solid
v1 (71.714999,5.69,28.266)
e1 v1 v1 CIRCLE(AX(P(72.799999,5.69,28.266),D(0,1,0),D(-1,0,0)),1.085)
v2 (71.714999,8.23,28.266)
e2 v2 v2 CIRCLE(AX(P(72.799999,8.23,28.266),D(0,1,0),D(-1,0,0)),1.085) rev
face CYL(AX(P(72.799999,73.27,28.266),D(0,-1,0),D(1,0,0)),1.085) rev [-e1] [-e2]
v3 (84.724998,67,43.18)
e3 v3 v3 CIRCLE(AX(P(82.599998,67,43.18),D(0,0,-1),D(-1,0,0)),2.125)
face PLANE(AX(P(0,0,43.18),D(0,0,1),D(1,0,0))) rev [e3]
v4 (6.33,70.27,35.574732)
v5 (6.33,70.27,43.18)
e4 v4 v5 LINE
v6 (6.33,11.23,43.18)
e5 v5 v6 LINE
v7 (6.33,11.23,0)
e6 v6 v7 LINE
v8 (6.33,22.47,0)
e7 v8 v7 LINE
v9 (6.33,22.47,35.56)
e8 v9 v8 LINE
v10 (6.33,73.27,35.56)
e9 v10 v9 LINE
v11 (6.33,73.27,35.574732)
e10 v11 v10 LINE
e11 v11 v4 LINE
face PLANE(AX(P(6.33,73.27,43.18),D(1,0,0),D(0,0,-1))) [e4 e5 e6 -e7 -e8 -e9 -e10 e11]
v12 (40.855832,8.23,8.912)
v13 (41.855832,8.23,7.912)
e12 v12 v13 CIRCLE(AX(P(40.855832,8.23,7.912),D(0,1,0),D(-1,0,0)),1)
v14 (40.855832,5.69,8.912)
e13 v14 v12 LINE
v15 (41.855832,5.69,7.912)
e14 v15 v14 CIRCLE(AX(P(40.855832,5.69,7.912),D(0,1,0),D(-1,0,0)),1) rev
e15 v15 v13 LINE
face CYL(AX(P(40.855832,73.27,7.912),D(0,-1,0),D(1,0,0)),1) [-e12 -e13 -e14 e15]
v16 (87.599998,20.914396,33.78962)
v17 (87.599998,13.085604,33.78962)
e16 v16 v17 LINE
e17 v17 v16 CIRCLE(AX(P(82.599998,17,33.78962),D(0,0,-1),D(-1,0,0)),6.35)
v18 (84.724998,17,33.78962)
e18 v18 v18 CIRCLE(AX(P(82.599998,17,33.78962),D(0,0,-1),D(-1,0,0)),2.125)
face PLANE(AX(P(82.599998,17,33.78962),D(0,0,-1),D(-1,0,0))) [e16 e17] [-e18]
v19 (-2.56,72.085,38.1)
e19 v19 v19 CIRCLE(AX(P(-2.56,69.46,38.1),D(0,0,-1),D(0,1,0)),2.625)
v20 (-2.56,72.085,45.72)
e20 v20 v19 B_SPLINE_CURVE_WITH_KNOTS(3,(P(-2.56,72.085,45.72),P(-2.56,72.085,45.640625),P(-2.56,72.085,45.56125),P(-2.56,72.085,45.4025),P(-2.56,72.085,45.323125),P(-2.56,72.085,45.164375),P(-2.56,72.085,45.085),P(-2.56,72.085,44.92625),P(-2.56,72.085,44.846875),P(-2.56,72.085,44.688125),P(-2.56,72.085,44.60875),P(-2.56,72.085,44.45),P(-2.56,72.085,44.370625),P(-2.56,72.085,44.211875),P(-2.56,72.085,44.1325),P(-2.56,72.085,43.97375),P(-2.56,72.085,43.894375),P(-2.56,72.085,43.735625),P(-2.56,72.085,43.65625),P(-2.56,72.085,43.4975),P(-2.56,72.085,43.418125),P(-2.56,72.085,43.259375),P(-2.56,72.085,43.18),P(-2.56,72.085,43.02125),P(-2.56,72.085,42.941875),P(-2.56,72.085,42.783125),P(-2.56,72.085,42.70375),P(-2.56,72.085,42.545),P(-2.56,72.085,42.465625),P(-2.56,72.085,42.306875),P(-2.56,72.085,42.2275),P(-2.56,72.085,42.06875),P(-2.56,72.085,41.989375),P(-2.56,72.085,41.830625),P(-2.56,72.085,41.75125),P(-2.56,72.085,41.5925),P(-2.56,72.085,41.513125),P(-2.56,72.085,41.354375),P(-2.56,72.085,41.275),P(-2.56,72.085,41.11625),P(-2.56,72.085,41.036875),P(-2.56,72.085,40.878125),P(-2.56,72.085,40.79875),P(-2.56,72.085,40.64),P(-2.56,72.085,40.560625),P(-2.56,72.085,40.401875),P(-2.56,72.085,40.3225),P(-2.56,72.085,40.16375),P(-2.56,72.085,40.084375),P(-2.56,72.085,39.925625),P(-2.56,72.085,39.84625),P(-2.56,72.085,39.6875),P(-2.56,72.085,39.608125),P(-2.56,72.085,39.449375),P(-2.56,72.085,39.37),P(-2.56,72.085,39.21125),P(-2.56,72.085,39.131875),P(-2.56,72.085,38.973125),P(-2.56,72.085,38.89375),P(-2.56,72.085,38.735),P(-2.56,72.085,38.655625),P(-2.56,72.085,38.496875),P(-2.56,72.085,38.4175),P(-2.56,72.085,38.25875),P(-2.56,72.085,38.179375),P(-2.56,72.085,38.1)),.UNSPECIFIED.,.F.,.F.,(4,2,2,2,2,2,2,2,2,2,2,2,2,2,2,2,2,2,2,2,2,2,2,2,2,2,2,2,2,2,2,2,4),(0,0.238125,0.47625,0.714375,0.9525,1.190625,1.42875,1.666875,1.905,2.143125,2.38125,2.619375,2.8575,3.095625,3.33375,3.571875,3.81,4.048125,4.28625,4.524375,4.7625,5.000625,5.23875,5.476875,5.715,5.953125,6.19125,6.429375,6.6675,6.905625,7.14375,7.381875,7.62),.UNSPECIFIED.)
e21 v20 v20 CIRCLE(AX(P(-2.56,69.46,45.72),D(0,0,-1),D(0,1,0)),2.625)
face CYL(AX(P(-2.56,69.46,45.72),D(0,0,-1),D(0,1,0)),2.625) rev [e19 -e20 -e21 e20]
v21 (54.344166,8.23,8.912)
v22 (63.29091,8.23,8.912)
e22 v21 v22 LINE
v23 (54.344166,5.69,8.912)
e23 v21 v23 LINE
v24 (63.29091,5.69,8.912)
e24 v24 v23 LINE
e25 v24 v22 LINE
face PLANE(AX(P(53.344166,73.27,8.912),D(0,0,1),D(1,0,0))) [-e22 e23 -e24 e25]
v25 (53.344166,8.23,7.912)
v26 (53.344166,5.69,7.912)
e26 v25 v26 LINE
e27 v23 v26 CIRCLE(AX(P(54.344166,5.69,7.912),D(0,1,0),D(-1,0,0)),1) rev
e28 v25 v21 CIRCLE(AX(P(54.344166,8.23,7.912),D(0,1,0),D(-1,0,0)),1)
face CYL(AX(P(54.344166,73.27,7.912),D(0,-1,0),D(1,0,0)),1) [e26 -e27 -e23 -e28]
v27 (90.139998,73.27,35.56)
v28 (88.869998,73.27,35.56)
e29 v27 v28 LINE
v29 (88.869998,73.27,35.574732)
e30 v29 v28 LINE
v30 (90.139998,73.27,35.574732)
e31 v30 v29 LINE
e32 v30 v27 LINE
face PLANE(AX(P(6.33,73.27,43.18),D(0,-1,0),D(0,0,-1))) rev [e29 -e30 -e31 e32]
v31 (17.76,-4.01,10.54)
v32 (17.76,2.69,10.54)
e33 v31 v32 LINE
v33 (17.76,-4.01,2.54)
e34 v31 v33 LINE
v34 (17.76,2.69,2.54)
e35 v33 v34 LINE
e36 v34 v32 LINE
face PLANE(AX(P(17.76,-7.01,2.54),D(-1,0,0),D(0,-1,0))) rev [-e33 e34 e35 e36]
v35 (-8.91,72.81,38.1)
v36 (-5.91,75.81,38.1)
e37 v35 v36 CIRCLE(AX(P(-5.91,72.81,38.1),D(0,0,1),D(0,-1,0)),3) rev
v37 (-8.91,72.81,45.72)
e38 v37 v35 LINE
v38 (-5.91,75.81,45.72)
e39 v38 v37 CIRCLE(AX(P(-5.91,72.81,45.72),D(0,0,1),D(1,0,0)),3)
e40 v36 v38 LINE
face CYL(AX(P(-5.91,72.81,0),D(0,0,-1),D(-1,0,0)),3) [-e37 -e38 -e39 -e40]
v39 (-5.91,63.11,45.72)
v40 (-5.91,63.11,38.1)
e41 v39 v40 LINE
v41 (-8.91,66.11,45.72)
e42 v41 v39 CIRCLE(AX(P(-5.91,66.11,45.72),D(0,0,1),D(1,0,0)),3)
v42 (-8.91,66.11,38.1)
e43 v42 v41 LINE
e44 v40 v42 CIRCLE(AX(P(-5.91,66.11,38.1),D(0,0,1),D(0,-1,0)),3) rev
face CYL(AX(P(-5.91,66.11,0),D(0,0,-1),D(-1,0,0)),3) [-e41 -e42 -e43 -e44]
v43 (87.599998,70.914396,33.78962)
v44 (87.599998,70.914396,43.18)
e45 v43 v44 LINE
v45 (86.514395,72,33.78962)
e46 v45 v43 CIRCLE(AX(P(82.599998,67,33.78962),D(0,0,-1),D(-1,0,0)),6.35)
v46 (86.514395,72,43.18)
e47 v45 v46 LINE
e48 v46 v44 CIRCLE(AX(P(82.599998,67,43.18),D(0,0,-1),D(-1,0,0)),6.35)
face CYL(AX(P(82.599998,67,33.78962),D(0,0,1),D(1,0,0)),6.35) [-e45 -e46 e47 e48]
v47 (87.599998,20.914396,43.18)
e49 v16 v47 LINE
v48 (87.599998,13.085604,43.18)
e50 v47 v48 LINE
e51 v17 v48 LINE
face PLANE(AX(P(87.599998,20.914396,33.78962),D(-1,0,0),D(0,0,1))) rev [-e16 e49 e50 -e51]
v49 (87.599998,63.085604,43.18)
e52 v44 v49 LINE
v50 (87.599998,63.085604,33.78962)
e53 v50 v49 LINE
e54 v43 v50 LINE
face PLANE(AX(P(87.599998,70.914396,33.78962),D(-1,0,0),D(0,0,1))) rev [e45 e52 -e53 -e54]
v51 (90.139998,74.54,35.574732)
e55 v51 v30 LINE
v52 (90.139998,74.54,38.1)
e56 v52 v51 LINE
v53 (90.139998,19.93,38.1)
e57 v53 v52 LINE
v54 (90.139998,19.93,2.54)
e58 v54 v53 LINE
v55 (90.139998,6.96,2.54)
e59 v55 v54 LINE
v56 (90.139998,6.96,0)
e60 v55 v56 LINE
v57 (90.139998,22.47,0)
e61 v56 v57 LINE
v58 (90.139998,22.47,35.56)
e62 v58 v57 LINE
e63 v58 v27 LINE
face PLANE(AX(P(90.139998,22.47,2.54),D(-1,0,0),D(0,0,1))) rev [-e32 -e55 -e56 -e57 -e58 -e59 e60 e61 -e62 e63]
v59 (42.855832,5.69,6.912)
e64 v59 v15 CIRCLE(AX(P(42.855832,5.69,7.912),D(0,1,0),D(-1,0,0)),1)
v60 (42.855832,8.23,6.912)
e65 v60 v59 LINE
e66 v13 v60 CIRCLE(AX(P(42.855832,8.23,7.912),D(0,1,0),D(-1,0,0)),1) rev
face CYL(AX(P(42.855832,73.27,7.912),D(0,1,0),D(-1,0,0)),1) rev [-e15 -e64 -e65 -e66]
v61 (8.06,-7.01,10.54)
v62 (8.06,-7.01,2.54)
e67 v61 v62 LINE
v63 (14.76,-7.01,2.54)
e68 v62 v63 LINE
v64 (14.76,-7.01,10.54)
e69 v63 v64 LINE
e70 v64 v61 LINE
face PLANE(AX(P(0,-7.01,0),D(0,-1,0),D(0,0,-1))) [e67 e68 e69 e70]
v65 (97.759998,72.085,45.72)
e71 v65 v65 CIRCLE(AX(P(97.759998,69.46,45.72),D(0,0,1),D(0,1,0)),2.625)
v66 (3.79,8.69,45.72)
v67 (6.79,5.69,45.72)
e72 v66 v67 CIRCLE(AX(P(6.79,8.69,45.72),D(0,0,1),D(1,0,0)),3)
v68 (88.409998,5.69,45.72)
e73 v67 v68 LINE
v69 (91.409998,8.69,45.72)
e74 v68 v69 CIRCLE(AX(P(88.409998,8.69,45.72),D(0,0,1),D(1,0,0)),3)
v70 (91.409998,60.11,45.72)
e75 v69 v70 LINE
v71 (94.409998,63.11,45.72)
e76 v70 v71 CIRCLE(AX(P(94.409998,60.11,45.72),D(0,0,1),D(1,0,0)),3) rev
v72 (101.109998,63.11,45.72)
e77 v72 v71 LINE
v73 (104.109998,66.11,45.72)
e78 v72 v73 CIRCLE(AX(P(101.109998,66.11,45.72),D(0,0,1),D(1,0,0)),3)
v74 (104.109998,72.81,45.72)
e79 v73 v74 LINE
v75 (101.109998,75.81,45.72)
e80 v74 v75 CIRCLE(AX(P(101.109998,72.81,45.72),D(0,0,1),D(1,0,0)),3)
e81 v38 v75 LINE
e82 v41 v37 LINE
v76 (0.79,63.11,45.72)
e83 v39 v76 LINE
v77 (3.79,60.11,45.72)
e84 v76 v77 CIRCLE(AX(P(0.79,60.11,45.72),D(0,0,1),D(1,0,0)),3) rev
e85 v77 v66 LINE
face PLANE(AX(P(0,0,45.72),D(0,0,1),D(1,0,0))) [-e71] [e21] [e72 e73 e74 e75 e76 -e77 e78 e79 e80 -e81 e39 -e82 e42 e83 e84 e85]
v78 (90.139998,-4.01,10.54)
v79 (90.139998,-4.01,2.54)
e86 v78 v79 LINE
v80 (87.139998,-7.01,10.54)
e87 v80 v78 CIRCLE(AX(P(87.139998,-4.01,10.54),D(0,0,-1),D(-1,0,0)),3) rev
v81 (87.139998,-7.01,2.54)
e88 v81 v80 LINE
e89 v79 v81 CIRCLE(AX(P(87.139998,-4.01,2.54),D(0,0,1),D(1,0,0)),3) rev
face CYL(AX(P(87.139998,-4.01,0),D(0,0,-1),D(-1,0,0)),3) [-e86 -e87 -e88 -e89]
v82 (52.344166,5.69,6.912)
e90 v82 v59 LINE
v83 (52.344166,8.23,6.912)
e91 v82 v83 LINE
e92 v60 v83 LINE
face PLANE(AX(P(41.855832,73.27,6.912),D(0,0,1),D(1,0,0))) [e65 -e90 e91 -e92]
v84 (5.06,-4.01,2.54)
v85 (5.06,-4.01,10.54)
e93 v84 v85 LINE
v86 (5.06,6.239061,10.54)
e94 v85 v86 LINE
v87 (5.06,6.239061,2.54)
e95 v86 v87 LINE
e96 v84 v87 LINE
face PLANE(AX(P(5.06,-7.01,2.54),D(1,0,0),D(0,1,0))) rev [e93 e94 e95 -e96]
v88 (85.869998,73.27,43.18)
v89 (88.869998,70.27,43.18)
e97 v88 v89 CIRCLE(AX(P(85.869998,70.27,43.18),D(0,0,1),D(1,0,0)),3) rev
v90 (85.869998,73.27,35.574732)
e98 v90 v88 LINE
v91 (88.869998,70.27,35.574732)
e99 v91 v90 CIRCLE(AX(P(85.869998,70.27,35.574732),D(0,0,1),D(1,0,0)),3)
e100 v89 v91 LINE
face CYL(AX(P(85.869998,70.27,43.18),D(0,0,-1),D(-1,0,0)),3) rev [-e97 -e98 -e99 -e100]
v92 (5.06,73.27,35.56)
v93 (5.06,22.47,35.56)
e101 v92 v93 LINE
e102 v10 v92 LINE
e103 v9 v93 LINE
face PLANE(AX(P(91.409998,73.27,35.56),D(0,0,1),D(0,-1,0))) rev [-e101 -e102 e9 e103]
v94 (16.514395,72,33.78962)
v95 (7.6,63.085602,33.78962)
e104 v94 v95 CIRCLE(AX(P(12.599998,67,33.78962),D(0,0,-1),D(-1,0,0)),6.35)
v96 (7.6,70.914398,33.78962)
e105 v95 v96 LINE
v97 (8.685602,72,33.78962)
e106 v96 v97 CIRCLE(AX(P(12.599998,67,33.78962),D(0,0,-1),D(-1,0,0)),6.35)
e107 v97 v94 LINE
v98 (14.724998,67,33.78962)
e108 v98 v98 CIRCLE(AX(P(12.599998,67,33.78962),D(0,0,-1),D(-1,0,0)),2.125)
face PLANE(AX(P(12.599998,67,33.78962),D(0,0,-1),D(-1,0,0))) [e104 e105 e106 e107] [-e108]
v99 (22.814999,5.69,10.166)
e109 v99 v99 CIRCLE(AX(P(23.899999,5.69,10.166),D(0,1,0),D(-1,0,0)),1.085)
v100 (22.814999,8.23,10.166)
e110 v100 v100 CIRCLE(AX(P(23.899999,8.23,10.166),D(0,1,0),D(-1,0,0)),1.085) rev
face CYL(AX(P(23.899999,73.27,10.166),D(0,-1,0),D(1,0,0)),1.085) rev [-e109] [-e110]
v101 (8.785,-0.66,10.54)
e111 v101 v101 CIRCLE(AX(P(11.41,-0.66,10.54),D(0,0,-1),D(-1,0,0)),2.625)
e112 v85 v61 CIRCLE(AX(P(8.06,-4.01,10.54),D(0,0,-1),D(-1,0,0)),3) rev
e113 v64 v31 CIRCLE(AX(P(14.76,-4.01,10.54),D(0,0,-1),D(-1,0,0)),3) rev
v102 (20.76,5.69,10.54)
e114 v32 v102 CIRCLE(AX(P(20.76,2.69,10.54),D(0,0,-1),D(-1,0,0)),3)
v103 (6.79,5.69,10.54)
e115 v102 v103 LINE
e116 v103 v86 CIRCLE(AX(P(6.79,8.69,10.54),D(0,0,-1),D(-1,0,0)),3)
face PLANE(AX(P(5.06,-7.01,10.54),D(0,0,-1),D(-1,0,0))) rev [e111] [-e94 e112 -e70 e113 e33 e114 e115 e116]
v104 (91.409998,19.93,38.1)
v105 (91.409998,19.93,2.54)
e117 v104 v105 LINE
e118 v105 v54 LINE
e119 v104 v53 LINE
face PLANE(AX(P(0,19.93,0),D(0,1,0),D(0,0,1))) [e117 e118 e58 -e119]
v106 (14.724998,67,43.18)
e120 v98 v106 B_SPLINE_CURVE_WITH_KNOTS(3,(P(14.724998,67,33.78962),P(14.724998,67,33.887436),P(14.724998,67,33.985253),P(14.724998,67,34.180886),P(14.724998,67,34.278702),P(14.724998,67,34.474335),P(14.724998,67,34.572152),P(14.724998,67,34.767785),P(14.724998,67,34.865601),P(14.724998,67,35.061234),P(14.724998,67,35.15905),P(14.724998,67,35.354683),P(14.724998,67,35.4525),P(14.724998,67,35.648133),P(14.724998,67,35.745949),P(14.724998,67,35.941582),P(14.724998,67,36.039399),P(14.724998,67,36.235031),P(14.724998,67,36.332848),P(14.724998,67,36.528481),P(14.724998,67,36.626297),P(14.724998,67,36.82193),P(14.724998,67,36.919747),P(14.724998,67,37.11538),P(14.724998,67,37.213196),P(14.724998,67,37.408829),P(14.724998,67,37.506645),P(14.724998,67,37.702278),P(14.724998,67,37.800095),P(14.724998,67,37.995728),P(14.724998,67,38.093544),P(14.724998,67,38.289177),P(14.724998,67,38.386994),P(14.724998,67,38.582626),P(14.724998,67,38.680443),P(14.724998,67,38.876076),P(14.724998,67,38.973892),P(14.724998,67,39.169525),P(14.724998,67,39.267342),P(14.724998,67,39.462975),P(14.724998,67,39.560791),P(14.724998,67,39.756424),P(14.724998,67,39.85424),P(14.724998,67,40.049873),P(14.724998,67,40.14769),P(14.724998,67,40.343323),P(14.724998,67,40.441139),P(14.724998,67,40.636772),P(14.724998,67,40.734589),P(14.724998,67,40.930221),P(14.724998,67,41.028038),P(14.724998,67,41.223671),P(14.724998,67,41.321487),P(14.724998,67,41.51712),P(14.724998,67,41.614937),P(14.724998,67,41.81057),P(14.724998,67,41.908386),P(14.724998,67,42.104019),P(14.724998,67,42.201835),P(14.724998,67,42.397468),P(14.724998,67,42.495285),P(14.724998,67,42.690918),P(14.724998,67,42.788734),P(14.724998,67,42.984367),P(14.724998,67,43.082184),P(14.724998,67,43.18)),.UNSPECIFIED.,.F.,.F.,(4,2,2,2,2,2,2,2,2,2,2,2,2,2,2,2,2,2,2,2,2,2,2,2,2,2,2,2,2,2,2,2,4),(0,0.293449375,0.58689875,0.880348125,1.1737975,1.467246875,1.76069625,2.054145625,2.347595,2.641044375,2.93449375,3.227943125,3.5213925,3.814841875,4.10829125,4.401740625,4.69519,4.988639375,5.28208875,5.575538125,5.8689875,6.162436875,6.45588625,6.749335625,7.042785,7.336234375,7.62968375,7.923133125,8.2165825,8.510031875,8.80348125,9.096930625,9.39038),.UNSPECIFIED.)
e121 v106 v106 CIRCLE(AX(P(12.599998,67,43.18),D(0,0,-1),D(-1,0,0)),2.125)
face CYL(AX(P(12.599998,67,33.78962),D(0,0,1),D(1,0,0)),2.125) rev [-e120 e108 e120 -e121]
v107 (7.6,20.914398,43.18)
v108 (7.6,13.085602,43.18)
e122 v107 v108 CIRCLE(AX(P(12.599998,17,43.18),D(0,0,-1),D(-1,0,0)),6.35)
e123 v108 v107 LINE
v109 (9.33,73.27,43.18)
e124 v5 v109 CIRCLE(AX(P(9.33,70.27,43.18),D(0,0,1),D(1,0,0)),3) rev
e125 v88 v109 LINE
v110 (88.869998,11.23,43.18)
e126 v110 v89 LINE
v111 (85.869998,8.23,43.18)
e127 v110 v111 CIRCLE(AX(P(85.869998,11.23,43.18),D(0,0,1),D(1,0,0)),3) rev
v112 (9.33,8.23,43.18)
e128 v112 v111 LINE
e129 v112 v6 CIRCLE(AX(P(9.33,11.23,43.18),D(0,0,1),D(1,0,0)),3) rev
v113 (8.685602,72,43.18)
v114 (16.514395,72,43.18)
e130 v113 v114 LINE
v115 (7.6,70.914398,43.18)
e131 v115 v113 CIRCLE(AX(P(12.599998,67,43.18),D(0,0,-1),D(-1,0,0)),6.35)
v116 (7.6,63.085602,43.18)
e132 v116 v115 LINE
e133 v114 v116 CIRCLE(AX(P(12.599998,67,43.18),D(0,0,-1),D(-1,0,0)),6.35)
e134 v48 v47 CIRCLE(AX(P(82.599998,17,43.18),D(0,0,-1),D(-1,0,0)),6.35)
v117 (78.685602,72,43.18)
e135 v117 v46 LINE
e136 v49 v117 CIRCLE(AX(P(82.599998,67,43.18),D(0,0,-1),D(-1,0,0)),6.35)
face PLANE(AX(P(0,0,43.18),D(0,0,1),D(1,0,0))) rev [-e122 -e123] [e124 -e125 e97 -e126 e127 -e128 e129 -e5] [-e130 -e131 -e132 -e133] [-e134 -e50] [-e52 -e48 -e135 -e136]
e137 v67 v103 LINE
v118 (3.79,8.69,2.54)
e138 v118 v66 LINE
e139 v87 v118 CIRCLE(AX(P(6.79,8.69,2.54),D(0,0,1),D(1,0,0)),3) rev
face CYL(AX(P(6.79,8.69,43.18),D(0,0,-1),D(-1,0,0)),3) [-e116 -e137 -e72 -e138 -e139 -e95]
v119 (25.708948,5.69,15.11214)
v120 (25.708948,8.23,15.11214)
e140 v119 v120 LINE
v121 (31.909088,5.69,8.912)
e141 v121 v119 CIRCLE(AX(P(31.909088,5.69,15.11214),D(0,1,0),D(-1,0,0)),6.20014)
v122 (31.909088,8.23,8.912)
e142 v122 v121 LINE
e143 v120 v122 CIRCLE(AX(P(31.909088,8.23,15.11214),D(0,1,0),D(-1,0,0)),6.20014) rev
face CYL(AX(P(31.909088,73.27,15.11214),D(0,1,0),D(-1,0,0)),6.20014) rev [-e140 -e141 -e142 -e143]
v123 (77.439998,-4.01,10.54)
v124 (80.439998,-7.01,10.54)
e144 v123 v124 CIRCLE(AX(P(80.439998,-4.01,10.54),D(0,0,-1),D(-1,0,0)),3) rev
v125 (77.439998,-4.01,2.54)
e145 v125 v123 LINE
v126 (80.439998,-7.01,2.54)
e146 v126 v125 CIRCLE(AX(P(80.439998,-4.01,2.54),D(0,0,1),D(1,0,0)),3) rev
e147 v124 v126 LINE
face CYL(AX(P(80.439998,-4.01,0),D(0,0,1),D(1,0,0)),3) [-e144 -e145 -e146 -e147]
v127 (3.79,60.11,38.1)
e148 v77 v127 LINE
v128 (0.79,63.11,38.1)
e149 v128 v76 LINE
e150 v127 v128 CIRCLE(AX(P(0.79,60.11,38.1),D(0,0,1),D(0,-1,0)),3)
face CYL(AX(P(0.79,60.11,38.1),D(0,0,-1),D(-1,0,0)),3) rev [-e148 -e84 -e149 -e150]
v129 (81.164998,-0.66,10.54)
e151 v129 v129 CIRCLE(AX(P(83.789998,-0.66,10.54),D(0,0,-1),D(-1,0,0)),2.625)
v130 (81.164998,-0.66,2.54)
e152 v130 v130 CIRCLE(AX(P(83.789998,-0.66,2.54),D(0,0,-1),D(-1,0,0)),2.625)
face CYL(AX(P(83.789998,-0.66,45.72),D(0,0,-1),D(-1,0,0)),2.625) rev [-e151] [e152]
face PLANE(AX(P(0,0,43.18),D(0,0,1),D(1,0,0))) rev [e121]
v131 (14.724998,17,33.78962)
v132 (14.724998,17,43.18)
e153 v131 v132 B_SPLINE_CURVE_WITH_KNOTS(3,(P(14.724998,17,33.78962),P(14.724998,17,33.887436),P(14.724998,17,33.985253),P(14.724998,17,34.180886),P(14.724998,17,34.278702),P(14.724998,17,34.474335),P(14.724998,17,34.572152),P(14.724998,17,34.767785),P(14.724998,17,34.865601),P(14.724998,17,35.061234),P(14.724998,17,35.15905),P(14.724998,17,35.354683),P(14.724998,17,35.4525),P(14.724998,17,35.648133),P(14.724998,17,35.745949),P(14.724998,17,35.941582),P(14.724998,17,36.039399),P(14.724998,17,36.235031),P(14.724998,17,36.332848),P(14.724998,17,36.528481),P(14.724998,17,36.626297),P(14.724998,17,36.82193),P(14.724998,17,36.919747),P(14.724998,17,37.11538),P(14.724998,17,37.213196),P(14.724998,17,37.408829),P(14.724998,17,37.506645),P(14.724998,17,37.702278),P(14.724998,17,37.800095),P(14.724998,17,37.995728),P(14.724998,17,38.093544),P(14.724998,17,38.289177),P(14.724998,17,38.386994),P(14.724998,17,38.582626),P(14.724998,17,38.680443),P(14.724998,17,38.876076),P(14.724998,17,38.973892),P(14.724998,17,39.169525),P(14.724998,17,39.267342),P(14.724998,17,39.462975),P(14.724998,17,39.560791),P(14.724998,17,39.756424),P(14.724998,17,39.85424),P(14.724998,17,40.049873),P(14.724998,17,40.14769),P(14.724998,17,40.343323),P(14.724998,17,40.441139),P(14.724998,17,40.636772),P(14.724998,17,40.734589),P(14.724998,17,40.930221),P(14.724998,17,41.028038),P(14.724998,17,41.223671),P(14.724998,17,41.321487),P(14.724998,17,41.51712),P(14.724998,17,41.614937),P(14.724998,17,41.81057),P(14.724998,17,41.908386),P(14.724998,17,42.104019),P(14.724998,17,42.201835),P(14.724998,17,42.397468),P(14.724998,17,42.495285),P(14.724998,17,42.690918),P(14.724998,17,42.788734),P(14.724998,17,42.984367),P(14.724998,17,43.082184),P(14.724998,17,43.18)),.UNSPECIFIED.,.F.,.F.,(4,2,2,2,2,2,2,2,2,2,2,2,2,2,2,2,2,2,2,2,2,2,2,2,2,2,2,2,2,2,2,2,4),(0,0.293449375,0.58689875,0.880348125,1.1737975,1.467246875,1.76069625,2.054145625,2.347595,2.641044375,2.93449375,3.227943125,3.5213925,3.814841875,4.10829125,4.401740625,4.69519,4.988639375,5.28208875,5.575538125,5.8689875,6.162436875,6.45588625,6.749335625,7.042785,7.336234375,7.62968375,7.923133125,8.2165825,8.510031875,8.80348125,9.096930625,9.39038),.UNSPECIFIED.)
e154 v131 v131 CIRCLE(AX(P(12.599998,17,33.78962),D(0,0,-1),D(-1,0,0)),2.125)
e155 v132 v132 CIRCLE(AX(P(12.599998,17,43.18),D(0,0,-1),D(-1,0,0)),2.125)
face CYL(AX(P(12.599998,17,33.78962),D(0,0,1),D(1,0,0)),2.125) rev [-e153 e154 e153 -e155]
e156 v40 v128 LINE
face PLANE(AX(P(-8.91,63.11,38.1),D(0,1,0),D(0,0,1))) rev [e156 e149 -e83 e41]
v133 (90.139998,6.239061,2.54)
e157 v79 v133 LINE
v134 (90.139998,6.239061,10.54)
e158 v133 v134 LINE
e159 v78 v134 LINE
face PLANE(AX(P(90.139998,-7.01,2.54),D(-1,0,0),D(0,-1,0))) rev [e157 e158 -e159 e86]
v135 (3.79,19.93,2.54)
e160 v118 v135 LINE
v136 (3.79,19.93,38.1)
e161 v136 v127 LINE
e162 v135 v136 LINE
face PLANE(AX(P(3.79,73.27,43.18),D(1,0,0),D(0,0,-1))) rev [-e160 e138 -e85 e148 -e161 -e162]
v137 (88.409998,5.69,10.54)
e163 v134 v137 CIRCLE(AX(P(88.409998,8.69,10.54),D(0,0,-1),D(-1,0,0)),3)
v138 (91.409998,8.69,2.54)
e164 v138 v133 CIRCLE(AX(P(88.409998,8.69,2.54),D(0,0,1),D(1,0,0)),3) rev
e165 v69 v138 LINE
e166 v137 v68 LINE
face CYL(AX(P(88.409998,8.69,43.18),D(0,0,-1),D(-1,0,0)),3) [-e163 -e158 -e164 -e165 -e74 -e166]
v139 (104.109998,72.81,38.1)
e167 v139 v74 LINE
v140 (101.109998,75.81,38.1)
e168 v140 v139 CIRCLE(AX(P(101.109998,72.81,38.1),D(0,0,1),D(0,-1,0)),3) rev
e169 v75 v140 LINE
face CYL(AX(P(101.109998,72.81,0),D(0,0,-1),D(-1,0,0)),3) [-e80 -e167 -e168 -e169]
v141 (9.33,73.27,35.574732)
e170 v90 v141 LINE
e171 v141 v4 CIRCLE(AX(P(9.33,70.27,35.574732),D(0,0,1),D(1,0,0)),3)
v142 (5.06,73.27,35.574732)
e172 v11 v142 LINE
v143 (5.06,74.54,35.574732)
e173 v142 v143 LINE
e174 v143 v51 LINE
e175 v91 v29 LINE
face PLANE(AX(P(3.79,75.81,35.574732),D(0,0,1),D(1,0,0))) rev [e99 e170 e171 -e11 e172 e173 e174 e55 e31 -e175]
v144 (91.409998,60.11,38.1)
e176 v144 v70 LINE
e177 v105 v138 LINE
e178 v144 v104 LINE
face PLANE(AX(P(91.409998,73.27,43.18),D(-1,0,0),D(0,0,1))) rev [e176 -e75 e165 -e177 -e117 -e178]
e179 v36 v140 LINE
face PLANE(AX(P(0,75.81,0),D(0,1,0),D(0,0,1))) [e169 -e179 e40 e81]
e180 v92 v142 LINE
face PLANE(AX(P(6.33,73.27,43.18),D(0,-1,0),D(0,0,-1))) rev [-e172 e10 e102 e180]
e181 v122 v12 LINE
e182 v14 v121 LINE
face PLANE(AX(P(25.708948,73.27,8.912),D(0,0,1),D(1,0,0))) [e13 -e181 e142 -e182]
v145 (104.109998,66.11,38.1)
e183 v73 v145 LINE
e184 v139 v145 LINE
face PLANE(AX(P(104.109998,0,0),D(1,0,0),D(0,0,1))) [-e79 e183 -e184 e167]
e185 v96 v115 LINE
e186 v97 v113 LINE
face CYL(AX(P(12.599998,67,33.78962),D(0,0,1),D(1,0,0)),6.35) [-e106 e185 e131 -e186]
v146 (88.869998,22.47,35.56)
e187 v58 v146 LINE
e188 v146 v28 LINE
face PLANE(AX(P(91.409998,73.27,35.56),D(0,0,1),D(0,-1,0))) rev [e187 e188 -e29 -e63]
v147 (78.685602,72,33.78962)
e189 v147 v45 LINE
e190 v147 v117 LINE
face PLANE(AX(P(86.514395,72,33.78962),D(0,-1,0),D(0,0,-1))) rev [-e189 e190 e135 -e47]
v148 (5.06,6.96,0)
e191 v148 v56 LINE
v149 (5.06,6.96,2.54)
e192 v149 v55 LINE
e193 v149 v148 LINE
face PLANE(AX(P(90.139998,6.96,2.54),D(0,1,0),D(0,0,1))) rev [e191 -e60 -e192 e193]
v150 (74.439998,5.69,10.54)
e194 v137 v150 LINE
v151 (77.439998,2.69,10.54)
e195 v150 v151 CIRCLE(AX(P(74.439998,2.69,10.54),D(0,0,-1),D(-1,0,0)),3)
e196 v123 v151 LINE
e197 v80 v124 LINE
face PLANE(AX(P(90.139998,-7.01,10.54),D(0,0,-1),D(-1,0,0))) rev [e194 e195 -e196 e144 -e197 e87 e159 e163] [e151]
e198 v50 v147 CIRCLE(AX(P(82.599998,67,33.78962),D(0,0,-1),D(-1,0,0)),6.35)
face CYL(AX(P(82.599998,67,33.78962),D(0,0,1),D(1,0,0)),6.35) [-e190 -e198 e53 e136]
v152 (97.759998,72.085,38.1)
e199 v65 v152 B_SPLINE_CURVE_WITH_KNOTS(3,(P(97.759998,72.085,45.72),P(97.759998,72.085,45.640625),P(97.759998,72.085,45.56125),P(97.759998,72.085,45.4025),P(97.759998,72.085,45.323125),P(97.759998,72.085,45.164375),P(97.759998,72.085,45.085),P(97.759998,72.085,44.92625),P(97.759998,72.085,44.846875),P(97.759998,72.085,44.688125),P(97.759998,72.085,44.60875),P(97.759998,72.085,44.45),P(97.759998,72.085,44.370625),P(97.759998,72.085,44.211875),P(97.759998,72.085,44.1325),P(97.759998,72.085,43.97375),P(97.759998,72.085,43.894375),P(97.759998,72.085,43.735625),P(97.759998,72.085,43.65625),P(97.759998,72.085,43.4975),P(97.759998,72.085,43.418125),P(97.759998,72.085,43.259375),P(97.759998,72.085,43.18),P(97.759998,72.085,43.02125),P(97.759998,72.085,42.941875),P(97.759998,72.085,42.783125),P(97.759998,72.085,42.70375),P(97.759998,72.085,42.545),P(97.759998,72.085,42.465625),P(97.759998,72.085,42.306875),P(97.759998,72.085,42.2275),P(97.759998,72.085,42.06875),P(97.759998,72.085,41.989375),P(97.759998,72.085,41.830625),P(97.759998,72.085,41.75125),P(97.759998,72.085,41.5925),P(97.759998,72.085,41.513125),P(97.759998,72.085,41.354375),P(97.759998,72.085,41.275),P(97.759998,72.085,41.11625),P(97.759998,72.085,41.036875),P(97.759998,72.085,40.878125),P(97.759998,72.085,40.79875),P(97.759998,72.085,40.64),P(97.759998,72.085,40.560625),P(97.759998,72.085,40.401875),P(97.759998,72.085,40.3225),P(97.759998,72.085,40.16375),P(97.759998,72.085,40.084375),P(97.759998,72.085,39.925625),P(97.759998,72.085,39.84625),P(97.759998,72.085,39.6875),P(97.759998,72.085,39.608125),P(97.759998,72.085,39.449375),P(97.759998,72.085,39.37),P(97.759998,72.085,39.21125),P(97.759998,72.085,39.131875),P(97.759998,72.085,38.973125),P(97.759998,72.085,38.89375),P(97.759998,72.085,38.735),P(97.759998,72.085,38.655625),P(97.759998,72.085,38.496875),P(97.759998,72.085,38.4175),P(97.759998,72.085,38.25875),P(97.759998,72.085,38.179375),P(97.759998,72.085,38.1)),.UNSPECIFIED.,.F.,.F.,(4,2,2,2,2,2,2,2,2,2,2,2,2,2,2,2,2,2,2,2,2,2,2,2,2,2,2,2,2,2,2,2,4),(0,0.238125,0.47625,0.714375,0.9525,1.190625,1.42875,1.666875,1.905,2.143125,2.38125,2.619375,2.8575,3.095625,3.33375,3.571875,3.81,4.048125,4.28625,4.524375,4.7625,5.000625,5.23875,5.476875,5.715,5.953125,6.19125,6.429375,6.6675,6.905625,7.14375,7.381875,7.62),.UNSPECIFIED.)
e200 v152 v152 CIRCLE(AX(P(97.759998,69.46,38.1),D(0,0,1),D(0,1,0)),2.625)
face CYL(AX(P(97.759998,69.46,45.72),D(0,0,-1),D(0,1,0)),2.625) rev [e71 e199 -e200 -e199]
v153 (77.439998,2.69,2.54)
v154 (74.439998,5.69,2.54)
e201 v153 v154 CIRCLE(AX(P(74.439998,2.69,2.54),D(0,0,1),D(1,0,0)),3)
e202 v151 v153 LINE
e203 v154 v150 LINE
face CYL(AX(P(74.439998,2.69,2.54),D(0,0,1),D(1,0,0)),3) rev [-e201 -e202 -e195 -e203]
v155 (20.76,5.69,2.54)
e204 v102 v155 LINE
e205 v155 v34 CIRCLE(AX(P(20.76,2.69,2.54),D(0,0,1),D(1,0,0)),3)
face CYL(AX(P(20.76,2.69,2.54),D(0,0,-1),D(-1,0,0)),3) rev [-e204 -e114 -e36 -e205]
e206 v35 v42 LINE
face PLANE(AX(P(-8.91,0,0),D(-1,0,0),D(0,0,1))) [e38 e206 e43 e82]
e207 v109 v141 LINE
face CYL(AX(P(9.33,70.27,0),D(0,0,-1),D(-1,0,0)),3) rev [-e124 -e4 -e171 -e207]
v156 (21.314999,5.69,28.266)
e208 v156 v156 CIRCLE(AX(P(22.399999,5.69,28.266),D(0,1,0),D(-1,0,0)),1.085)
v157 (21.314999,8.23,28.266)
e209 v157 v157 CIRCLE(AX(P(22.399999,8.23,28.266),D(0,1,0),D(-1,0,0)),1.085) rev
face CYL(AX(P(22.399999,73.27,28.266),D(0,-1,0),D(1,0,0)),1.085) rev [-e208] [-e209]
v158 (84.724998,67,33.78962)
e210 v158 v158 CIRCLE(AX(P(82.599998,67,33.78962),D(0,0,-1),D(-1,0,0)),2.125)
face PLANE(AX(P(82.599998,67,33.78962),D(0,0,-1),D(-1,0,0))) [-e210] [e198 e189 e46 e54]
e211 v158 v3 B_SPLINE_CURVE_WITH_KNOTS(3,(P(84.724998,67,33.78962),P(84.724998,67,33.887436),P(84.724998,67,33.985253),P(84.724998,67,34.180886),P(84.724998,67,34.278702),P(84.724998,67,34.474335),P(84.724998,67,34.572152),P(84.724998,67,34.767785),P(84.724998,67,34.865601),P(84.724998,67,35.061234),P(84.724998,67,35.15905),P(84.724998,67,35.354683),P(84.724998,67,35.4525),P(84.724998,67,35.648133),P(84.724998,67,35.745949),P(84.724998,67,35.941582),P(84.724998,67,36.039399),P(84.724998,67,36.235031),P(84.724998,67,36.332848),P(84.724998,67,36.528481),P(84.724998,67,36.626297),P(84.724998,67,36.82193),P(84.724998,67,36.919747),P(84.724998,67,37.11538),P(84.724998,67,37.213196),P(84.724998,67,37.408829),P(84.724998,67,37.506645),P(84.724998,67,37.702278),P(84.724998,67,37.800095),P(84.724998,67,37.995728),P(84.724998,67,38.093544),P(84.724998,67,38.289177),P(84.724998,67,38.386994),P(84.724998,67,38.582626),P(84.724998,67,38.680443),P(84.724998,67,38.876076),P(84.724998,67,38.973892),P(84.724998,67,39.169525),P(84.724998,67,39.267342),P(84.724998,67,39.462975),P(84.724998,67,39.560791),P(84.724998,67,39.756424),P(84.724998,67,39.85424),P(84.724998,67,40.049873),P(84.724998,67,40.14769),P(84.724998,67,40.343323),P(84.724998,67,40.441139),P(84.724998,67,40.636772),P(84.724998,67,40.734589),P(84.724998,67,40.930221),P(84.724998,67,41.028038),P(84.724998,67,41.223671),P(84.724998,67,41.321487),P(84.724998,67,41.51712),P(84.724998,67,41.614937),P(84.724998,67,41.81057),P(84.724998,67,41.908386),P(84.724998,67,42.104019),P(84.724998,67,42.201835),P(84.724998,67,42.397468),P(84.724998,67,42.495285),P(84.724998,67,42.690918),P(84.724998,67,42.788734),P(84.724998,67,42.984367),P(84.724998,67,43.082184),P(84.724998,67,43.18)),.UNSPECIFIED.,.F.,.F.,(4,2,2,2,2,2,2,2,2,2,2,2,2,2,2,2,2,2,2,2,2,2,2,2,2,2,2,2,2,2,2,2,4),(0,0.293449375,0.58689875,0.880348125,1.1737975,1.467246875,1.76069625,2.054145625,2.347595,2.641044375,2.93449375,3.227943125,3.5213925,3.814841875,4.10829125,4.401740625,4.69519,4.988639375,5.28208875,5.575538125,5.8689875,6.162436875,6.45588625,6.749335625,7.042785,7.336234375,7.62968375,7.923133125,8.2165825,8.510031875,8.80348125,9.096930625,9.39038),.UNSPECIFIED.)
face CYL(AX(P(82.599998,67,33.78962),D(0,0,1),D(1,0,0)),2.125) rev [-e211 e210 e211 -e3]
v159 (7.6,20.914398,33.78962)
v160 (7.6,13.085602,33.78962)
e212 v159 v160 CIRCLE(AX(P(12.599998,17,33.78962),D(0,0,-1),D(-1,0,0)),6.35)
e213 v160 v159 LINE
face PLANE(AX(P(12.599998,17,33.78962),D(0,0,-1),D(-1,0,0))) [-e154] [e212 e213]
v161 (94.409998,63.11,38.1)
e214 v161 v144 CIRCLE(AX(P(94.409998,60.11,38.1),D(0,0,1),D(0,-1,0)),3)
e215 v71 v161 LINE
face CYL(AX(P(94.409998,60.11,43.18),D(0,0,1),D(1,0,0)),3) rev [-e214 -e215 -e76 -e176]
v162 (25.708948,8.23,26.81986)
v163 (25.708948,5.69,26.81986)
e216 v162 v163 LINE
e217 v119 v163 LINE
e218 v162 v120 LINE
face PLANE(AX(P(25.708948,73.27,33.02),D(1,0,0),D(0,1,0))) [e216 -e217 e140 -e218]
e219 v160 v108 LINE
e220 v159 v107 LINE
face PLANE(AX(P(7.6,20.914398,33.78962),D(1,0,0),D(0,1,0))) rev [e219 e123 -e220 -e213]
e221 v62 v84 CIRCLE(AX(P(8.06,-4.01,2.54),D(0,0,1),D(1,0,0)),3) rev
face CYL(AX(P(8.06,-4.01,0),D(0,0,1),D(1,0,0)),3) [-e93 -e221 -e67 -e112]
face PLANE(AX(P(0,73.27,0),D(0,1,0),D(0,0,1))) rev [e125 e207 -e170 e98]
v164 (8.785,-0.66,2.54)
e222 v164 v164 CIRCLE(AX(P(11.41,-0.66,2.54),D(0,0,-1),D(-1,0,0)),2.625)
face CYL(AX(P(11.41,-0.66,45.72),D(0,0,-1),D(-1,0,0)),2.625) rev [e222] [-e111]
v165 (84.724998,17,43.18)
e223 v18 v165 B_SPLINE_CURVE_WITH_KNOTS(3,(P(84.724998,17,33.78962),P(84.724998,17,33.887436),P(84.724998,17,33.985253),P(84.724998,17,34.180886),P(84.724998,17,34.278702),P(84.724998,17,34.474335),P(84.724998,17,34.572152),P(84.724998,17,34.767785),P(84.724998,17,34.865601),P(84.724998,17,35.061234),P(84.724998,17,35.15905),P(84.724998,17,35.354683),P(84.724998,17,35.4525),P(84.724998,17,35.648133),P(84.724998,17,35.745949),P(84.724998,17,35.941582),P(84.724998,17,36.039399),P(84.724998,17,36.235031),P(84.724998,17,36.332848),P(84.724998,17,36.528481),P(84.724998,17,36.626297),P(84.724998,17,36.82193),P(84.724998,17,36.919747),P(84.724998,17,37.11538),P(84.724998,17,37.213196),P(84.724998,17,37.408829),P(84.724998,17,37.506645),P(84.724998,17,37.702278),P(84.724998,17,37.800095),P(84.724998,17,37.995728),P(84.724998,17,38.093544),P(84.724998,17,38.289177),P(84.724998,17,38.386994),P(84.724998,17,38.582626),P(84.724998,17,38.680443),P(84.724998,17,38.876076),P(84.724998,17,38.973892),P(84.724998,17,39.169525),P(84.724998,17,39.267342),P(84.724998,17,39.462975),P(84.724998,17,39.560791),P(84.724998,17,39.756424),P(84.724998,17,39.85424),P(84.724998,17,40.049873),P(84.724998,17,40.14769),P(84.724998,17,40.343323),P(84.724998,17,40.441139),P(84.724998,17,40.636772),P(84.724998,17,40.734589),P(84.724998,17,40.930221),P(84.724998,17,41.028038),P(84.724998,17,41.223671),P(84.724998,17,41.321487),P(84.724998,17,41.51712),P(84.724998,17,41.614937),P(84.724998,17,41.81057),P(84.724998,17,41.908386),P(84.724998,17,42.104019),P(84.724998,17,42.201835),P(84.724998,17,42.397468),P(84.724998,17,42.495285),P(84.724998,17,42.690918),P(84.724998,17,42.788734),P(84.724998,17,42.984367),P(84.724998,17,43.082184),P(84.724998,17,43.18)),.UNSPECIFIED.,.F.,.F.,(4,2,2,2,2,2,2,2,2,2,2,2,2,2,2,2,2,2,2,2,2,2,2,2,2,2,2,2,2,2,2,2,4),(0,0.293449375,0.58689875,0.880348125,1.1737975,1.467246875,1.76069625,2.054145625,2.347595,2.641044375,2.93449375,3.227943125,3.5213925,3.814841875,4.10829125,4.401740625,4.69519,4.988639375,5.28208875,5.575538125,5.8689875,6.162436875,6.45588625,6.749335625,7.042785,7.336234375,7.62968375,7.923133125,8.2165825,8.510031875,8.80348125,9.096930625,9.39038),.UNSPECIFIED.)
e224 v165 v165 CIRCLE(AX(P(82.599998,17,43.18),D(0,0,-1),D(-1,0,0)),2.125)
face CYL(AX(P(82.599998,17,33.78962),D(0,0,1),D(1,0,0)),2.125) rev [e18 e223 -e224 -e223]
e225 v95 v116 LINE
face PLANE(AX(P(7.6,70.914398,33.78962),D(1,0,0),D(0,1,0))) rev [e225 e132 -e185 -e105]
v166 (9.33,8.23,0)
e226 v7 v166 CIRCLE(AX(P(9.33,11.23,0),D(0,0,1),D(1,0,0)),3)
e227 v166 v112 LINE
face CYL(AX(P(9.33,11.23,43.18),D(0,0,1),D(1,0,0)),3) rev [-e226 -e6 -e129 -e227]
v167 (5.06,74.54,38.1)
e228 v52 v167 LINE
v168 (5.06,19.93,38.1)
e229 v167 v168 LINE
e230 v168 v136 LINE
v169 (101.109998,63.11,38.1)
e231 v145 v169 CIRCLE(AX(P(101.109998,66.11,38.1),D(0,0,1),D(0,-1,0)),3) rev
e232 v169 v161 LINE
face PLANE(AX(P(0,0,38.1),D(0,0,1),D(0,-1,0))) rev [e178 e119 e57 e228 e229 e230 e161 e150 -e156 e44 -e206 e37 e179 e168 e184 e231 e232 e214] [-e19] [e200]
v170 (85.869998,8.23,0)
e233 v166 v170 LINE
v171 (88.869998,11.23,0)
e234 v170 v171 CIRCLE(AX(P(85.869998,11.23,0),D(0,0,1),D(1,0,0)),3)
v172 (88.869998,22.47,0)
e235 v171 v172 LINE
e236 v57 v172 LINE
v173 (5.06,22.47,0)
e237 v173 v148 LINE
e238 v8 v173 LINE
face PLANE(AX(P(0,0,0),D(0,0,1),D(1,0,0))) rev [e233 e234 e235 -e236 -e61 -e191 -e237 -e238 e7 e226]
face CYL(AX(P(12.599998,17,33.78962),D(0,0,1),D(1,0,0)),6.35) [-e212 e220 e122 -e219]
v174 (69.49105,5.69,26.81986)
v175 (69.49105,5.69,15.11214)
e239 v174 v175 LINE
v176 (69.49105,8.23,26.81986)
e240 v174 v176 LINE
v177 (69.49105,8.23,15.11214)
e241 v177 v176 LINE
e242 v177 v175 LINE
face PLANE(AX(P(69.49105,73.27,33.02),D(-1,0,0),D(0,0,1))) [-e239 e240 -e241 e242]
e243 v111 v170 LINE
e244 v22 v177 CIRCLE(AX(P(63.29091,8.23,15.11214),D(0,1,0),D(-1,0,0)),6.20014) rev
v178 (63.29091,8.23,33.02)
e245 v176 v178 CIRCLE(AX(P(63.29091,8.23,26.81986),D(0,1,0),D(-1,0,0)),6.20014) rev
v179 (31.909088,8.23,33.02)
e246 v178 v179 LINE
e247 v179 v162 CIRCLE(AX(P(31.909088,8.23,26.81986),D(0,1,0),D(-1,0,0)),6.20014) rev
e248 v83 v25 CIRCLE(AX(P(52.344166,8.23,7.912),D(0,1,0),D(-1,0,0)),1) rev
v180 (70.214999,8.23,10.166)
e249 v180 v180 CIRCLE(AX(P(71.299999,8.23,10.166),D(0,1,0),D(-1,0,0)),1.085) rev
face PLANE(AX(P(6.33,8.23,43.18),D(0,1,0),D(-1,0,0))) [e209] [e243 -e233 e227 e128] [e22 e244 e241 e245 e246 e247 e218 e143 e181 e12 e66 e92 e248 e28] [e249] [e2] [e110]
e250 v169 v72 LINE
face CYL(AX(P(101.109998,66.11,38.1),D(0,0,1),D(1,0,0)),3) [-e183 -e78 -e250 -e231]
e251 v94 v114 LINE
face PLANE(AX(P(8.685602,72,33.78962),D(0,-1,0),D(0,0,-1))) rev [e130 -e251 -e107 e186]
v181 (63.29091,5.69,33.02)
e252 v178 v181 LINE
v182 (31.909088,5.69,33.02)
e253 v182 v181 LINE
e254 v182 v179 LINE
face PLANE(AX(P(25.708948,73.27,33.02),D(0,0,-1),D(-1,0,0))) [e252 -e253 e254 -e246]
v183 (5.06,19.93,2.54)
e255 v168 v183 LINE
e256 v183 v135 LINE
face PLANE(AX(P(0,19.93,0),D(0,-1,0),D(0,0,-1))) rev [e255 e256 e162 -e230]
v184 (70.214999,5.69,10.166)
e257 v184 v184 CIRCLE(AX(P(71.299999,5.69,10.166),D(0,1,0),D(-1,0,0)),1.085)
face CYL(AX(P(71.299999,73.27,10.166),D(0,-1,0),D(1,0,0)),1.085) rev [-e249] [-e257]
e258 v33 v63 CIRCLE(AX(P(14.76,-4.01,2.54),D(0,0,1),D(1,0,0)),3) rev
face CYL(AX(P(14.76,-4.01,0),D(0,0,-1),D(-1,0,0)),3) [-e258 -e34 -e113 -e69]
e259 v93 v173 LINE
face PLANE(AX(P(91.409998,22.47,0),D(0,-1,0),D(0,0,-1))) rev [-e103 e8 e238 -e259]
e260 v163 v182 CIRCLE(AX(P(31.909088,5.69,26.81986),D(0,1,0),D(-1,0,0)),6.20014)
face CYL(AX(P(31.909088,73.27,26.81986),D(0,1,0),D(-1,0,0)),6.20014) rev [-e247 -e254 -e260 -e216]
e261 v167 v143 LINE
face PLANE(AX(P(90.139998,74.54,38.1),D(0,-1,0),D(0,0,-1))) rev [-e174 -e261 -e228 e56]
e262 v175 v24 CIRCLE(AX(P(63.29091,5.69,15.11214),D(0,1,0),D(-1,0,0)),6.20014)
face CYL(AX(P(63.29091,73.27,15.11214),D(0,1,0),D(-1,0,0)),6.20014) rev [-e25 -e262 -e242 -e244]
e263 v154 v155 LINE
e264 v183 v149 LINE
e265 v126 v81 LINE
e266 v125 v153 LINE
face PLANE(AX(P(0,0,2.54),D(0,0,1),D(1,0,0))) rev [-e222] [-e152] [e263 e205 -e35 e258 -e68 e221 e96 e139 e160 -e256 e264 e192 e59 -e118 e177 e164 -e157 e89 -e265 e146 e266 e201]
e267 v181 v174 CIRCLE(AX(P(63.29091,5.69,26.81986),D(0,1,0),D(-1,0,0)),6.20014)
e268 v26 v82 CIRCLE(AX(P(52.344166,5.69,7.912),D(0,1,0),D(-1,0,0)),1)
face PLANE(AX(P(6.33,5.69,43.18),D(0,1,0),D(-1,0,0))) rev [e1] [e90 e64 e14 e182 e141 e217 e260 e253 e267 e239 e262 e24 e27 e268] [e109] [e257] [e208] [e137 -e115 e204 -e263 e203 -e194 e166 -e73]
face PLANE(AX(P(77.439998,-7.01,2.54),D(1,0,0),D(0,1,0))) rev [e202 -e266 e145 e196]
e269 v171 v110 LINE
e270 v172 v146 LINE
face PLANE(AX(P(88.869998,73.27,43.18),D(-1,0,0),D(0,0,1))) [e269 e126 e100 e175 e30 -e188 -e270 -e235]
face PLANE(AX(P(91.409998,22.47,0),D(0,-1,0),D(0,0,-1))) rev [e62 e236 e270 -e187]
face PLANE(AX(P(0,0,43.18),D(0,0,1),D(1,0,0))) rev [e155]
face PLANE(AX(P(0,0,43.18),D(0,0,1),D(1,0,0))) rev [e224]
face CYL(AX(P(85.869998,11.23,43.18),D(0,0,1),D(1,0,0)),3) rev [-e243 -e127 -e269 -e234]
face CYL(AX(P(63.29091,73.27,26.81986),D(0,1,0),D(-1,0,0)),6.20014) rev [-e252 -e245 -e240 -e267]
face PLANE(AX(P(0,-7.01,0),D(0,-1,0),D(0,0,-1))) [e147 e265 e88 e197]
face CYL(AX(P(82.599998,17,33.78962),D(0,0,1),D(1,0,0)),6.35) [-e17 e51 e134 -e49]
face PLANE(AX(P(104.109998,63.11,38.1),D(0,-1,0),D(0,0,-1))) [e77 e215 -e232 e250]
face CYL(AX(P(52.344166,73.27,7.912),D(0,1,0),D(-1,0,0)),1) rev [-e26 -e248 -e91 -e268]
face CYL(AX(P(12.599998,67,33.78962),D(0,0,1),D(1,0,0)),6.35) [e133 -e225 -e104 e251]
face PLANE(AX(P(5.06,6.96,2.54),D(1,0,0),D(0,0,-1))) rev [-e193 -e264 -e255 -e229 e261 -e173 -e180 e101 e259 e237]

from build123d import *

# Parameters (mm, degrees)
SKETCH1_W           = 82.539998569
SKETCH1_H           = 65.04
BOSS_EXTRUDE1_DEPTH = 43.18
SHELL1_T            = 2.54
SKETCH2_R           = 1.085
CUT_EXTRUDE1_DEPTH  = 124.952130409
FILLET1_R           = 6.20014
FILLET2_R           = 1
SKETCH6_W           = 35.56
SKETCH6_H           = 50.8
CUT_EXTRUDE2_DEPTH  = 124.028758627
SKETCH3_R           = 2.125
BOSS_EXTRUDE2_DEPTH = 9.39038
CUT_EXTRUDE3_DEPTH  = 2.54
SKETCH8_W           = 1.27
SKETCH8_H           = 33.02
CUT_EXTRUDE4_DEPTH  = 2.54
SKETCH10_W          = 87.619998569
SKETCH10_H          = 10.145268184
BOSS_EXTRUDE3_DEPTH = 2.54
CUT_EXTRUDE5_DEPTH  = 2.54
SKETCH11_W          = 12.7
SKETCH11_H          = 8
BOSS_EXTRUDE4_DEPTH = 12.7
SKETCH12_R          = 2.625
CUT_EXTRUDE6_DEPTH  = 127.362400741
SKETCH13_W          = 7.62
SKETCH13_H          = 12.7
BOSS_EXTRUDE5_DEPTH = 12.7
SKETCH14_R          = 2.625
CUT_EXTRUDE7_DEPTH  = 125.717897357
FILLET3_R           = 3


with BuildPart() as part:
    # Sketch1 → Boss-Extrude1 (new body)
    with BuildSketch(Plane.XY):
        with Locations((47.599999189, 40.75)):
            Rectangle(SKETCH1_W, SKETCH1_H)
    extrude(amount=BOSS_EXTRUDE1_DEPTH)

    # Shell1
    shell1_openings = [part.faces().sort_by_distance(p)[0] for p in [
        (47.599999189, 73.27, 21.59),
        (47.599999189, 40.75, 0),
    ]]
    offset(amount=SHELL1_T, openings=shell1_openings, kind=Kind.INTERSECTION)

    # Sketch2 → Cut-Extrude1 (cut, through all)
    with BuildSketch(Plane(origin=(97.099998474, 5.69, 0), x_dir=(0, 0, -1), z_dir=(0, 1, 0))):
        with Locations(Location((-10.166, 73.199999285, 0), (0, 0, 90))):
            Circle(SKETCH2_R)
        with Locations(Location((-10.166, 25.799999285, 0), (0, 0, 90))):
            Circle(SKETCH2_R)
        with Locations(Location((-28.266, 24.299999285, 0), (0, 0, 90))):
            Circle(SKETCH2_R)
        with Locations(Location((-28.266, 74.699999285, 0), (0, 0, 90))):
            Circle(SKETCH2_R)
        Polygon((-33.02, 71.391050497), (-8.912, 71.391050497), (-8.912, 55.244166488), (-6.912, 55.244166488), (-6.912, 43.755832082), (-8.912, 43.755832082), (-8.912, 27.608948073), (-33.02, 27.608948073), align=None)
    extrude(amount=CUT_EXTRUDE1_DEPTH, mode=Mode.SUBTRACT)

    # Fillet1
    fillet1_edges = [part.edges().sort_by_distance(p)[0] for p in [
        (25.708947978, 6.96, 33.02),
        (69.491050401, 6.96, 33.02),
        (69.491050401, 6.96, 8.912),
        (25.708947978, 6.96, 8.912),
    ]]
    fillet(fillet1_edges, radius=FILLET1_R)

    # Fillet2
    fillet2_edges = [part.edges().sort_by_distance(p)[0] for p in [
        (53.344166393, 6.96, 6.912),
        (41.855831986, 6.96, 6.912),
    ]]
    fillet(fillet2_edges, radius=FILLET2_R)
    fillet2_2_edges = [part.edges().sort_by_distance(p)[0] for p in [
        (53.344166393, 6.96, 8.912),
        (41.855831986, 6.96, 8.912),
    ]]
    fillet(fillet2_2_edges, radius=FILLET2_R - 0.0001)  # a hair under: the kernel refuses the full size

    # Sketch6 → Cut-Extrude2 (cut, through all)
    with BuildSketch(Plane.ZY.offset(-3.789999905)):
        with Locations((17.78, 47.87)):
            Rectangle(SKETCH6_W, SKETCH6_H)
    extrude(amount=-CUT_EXTRUDE2_DEPTH, mode=Mode.SUBTRACT)

    # Sketch3 → Boss-Extrude2 (add)
    # profile 1 of 4: a face of its own
    with BuildSketch(Plane(origin=(0, 0, 43.18), x_dir=(-1, 0, 0), z_dir=(0, 0, -1))):
        with BuildLine():
            Line((-86.514394884, 72), (-78.685601874, 72))
            ThreePointArc((-78.685601874, 72), (-78.109870373, 62.509871885), (-87.599998474, 63.085603617))
            Line((-87.599998474, 63.085603617), (-87.599998474, 70.914396383))
            ThreePointArc((-87.599998474, 70.914396383), (-87.090126494, 71.490128006), (-86.514394884, 72))
        make_face()
        with Locations(Location((-82.599998379, 67, 0), (0, 0, 180))):
            Circle(SKETCH3_R, mode=Mode.SUBTRACT)
    # profile 2 of 4: a face of its own
    with BuildSketch(Plane(origin=(0, 0, 43.18), x_dir=(-1, 0, 0), z_dir=(0, 0, -1))):
        with BuildLine():
            Line((-7.599999905, 70.914398454), (-7.599999905, 63.085601546))
            ThreePointArc((-7.599999905, 63.085601546), (-17.090127314, 62.509872815), (-16.514394884, 72))
            Line((-16.514394884, 72), (-8.685601874, 72))
            ThreePointArc((-8.685601874, 72), (-8.109871193, 71.490128936), (-7.599999905, 70.914398454))
        make_face()
        with Locations(Location((-12.599998379, 67, 0), (0, 0, 180))):
            Circle(SKETCH3_R, mode=Mode.SUBTRACT)
    # profile 3 of 4: a face of its own
    with BuildSketch(Plane(origin=(0, 0, 43.18), x_dir=(-1, 0, 0), z_dir=(0, 0, -1))):
        with BuildLine():
            Line((-7.599999905, 20.914398454), (-7.599999905, 13.085601546))
            ThreePointArc((-7.599999905, 13.085601546), (-18.949998379, 17), (-7.599999905, 20.914398454))
        make_face()
        with Locations(Location((-12.599998379, 17, 0), (0, 0, 180))):
            Circle(SKETCH3_R, mode=Mode.SUBTRACT)
    # profile 4 of 4: a face of its own
    with BuildSketch(Plane(origin=(0, 0, 43.18), x_dir=(-1, 0, 0), z_dir=(0, 0, -1))):
        with BuildLine():
            Line((-87.599998474, 20.914396383), (-87.599998474, 13.085603617))
            ThreePointArc((-87.599998474, 13.085603617), (-76.249998379, 17), (-87.599998474, 20.914396383))
        make_face()
        with Locations(Location((-82.599998379, 17, 0), (0, 0, 180))):
            Circle(SKETCH3_R, mode=Mode.SUBTRACT)
    extrude(amount=BOSS_EXTRUDE2_DEPTH)

    # Sketch7 → Cut-Extrude3 (cut)
    with BuildSketch(Plane(origin=(0, 0, 0), x_dir=(-1, 0, 0), z_dir=(0, 0, -1))):
        Polygon((-91.409998474, 22.47), (-90.139998474, 22.47), (-90.139998474, 6.96), (-5.059999905, 6.96), (-5.059999905, 22.47), (-3.789999905, 22.47), (-3.789999905, 5.69), (-91.409998474, 5.69), align=None)
    extrude(amount=-CUT_EXTRUDE3_DEPTH, mode=Mode.SUBTRACT)

    # Sketch8 → Cut-Extrude4 (cut)
    with BuildSketch(Plane(origin=(0, 22.47, 0), x_dir=(1, 0, 0), z_dir=(0, 1, 0))):
        with Locations((4.424999905, -19.05)):
            Rectangle(SKETCH8_W, SKETCH8_H)
        with Locations((90.774998474, -19.05)):
            Rectangle(SKETCH8_W, SKETCH8_H)
    extrude(amount=-CUT_EXTRUDE4_DEPTH, mode=Mode.SUBTRACT)

    # Sketch10 → Boss-Extrude3 (add)
    with BuildSketch(Plane(origin=(0, 73.27, 0), x_dir=(1, 0, 0), z_dir=(0, 1, 0))):
        with Locations((47.59999919, -40.647365908)):
            Rectangle(SKETCH10_W, SKETCH10_H)
    extrude(amount=BOSS_EXTRUDE3_DEPTH)

    # Sketch9 → Cut-Extrude5 (cut)
    with BuildSketch(Plane(origin=(0, 0, 35.56), x_dir=(-1, 0, 0), z_dir=(0, 0, -1))):
        Polygon((-90.139998474, 73.27), (-90.139998474, 74.54), (-5.059999905, 74.54), (-5.059999905, 73.27), (-5.059999905, 19.93), (-3.789999905, 19.93), (-3.789999905, 73.27), (-3.789999905, 75.81), (-91.409998474, 75.81), (-91.409998474, 73.27), (-91.409998474, 19.93), (-90.139998474, 19.93), align=None)
    extrude(amount=-CUT_EXTRUDE5_DEPTH, mode=Mode.SUBTRACT)

    # Sketch11 → Boss-Extrude4 (add)
    with BuildSketch(Plane.XZ.offset(-5.69)):
        with Locations((83.789998474, 6.54)):
            Rectangle(SKETCH11_W, SKETCH11_H)
        with Locations((11.409999905, 6.54)):
            Rectangle(SKETCH11_W, SKETCH11_H)
    extrude(amount=BOSS_EXTRUDE4_DEPTH)

    # Sketch12 → Cut-Extrude6 (cut, through all)
    with BuildSketch(Plane(origin=(0, 0, 2.54), x_dir=(-1, 0, 0), z_dir=(0, 0, -1))):
        with Locations((-83.789998474, -0.66)):
            Circle(SKETCH12_R)
        with Locations((-11.409999905, -0.66)):
            Circle(SKETCH12_R)
    extrude(amount=-CUT_EXTRUDE6_DEPTH, mode=Mode.SUBTRACT)

    # Sketch13 → Boss-Extrude5 (add)
    with BuildSketch(Plane.ZY.offset(-3.789999905)):
        with Locations((41.91, 69.46)):
            Rectangle(SKETCH13_W, SKETCH13_H)
    boss_extrude5 = extrude(amount=BOSS_EXTRUDE5_DEPTH)

    # Sketch14 → Cut-Extrude7 (cut, through all)
    with BuildSketch(Plane(origin=(0, 0, 38.1), x_dir=(-1, 0, 0), z_dir=(0, 0, -1))):
        with Locations(Location((2.560000095, 69.46, 0), (0, 0, 90))):
            Circle(SKETCH14_R)
    cut_extrude7 = extrude(amount=-CUT_EXTRUDE7_DEPTH, mode=Mode.SUBTRACT)

    # Mirror1: Boss-Extrude5, Cut-Extrude7 across plane
    add(boss_extrude5.mirror(Plane.ZY.offset(-47.599999189)))
    add(cut_extrude7.mirror(Plane.ZY.offset(-47.599999189)), mode=Mode.SUBTRACT)

    # Fillet3
    fillet3_edges = [part.edges().sort_by_distance(p)[0] for p in [
        (6.329999905, 73.27, 39.377365908),
        (6.329999905, 8.23, 21.59),
        (88.869998474, 8.23, 21.59),
        (88.869998474, 73.27, 39.377365908),
        (17.759999905, 5.69, 6.54),
        (17.759999905, -7.01, 6.54),
        (5.059999905, -7.01, 6.54),
        (77.439998474, 5.69, 6.54),
        (90.139998474, -7.01, 6.54),
        (77.439998474, -7.01, 6.54),
        (3.789999905, 63.11, 41.91),
        (-8.910000095, 63.11, 41.91),
        (-8.910000095, 75.81, 41.91),
        (104.109998474, 75.81, 41.91),
        (104.109998474, 63.11, 41.91),
        (91.409998474, 63.11, 41.91),
        (91.409998474, 5.69, 24.13),
        (3.789999905, 5.69, 24.13),
    ]]
    fillet(fillet3_edges, radius=FILLET3_R)


solid = part.part
